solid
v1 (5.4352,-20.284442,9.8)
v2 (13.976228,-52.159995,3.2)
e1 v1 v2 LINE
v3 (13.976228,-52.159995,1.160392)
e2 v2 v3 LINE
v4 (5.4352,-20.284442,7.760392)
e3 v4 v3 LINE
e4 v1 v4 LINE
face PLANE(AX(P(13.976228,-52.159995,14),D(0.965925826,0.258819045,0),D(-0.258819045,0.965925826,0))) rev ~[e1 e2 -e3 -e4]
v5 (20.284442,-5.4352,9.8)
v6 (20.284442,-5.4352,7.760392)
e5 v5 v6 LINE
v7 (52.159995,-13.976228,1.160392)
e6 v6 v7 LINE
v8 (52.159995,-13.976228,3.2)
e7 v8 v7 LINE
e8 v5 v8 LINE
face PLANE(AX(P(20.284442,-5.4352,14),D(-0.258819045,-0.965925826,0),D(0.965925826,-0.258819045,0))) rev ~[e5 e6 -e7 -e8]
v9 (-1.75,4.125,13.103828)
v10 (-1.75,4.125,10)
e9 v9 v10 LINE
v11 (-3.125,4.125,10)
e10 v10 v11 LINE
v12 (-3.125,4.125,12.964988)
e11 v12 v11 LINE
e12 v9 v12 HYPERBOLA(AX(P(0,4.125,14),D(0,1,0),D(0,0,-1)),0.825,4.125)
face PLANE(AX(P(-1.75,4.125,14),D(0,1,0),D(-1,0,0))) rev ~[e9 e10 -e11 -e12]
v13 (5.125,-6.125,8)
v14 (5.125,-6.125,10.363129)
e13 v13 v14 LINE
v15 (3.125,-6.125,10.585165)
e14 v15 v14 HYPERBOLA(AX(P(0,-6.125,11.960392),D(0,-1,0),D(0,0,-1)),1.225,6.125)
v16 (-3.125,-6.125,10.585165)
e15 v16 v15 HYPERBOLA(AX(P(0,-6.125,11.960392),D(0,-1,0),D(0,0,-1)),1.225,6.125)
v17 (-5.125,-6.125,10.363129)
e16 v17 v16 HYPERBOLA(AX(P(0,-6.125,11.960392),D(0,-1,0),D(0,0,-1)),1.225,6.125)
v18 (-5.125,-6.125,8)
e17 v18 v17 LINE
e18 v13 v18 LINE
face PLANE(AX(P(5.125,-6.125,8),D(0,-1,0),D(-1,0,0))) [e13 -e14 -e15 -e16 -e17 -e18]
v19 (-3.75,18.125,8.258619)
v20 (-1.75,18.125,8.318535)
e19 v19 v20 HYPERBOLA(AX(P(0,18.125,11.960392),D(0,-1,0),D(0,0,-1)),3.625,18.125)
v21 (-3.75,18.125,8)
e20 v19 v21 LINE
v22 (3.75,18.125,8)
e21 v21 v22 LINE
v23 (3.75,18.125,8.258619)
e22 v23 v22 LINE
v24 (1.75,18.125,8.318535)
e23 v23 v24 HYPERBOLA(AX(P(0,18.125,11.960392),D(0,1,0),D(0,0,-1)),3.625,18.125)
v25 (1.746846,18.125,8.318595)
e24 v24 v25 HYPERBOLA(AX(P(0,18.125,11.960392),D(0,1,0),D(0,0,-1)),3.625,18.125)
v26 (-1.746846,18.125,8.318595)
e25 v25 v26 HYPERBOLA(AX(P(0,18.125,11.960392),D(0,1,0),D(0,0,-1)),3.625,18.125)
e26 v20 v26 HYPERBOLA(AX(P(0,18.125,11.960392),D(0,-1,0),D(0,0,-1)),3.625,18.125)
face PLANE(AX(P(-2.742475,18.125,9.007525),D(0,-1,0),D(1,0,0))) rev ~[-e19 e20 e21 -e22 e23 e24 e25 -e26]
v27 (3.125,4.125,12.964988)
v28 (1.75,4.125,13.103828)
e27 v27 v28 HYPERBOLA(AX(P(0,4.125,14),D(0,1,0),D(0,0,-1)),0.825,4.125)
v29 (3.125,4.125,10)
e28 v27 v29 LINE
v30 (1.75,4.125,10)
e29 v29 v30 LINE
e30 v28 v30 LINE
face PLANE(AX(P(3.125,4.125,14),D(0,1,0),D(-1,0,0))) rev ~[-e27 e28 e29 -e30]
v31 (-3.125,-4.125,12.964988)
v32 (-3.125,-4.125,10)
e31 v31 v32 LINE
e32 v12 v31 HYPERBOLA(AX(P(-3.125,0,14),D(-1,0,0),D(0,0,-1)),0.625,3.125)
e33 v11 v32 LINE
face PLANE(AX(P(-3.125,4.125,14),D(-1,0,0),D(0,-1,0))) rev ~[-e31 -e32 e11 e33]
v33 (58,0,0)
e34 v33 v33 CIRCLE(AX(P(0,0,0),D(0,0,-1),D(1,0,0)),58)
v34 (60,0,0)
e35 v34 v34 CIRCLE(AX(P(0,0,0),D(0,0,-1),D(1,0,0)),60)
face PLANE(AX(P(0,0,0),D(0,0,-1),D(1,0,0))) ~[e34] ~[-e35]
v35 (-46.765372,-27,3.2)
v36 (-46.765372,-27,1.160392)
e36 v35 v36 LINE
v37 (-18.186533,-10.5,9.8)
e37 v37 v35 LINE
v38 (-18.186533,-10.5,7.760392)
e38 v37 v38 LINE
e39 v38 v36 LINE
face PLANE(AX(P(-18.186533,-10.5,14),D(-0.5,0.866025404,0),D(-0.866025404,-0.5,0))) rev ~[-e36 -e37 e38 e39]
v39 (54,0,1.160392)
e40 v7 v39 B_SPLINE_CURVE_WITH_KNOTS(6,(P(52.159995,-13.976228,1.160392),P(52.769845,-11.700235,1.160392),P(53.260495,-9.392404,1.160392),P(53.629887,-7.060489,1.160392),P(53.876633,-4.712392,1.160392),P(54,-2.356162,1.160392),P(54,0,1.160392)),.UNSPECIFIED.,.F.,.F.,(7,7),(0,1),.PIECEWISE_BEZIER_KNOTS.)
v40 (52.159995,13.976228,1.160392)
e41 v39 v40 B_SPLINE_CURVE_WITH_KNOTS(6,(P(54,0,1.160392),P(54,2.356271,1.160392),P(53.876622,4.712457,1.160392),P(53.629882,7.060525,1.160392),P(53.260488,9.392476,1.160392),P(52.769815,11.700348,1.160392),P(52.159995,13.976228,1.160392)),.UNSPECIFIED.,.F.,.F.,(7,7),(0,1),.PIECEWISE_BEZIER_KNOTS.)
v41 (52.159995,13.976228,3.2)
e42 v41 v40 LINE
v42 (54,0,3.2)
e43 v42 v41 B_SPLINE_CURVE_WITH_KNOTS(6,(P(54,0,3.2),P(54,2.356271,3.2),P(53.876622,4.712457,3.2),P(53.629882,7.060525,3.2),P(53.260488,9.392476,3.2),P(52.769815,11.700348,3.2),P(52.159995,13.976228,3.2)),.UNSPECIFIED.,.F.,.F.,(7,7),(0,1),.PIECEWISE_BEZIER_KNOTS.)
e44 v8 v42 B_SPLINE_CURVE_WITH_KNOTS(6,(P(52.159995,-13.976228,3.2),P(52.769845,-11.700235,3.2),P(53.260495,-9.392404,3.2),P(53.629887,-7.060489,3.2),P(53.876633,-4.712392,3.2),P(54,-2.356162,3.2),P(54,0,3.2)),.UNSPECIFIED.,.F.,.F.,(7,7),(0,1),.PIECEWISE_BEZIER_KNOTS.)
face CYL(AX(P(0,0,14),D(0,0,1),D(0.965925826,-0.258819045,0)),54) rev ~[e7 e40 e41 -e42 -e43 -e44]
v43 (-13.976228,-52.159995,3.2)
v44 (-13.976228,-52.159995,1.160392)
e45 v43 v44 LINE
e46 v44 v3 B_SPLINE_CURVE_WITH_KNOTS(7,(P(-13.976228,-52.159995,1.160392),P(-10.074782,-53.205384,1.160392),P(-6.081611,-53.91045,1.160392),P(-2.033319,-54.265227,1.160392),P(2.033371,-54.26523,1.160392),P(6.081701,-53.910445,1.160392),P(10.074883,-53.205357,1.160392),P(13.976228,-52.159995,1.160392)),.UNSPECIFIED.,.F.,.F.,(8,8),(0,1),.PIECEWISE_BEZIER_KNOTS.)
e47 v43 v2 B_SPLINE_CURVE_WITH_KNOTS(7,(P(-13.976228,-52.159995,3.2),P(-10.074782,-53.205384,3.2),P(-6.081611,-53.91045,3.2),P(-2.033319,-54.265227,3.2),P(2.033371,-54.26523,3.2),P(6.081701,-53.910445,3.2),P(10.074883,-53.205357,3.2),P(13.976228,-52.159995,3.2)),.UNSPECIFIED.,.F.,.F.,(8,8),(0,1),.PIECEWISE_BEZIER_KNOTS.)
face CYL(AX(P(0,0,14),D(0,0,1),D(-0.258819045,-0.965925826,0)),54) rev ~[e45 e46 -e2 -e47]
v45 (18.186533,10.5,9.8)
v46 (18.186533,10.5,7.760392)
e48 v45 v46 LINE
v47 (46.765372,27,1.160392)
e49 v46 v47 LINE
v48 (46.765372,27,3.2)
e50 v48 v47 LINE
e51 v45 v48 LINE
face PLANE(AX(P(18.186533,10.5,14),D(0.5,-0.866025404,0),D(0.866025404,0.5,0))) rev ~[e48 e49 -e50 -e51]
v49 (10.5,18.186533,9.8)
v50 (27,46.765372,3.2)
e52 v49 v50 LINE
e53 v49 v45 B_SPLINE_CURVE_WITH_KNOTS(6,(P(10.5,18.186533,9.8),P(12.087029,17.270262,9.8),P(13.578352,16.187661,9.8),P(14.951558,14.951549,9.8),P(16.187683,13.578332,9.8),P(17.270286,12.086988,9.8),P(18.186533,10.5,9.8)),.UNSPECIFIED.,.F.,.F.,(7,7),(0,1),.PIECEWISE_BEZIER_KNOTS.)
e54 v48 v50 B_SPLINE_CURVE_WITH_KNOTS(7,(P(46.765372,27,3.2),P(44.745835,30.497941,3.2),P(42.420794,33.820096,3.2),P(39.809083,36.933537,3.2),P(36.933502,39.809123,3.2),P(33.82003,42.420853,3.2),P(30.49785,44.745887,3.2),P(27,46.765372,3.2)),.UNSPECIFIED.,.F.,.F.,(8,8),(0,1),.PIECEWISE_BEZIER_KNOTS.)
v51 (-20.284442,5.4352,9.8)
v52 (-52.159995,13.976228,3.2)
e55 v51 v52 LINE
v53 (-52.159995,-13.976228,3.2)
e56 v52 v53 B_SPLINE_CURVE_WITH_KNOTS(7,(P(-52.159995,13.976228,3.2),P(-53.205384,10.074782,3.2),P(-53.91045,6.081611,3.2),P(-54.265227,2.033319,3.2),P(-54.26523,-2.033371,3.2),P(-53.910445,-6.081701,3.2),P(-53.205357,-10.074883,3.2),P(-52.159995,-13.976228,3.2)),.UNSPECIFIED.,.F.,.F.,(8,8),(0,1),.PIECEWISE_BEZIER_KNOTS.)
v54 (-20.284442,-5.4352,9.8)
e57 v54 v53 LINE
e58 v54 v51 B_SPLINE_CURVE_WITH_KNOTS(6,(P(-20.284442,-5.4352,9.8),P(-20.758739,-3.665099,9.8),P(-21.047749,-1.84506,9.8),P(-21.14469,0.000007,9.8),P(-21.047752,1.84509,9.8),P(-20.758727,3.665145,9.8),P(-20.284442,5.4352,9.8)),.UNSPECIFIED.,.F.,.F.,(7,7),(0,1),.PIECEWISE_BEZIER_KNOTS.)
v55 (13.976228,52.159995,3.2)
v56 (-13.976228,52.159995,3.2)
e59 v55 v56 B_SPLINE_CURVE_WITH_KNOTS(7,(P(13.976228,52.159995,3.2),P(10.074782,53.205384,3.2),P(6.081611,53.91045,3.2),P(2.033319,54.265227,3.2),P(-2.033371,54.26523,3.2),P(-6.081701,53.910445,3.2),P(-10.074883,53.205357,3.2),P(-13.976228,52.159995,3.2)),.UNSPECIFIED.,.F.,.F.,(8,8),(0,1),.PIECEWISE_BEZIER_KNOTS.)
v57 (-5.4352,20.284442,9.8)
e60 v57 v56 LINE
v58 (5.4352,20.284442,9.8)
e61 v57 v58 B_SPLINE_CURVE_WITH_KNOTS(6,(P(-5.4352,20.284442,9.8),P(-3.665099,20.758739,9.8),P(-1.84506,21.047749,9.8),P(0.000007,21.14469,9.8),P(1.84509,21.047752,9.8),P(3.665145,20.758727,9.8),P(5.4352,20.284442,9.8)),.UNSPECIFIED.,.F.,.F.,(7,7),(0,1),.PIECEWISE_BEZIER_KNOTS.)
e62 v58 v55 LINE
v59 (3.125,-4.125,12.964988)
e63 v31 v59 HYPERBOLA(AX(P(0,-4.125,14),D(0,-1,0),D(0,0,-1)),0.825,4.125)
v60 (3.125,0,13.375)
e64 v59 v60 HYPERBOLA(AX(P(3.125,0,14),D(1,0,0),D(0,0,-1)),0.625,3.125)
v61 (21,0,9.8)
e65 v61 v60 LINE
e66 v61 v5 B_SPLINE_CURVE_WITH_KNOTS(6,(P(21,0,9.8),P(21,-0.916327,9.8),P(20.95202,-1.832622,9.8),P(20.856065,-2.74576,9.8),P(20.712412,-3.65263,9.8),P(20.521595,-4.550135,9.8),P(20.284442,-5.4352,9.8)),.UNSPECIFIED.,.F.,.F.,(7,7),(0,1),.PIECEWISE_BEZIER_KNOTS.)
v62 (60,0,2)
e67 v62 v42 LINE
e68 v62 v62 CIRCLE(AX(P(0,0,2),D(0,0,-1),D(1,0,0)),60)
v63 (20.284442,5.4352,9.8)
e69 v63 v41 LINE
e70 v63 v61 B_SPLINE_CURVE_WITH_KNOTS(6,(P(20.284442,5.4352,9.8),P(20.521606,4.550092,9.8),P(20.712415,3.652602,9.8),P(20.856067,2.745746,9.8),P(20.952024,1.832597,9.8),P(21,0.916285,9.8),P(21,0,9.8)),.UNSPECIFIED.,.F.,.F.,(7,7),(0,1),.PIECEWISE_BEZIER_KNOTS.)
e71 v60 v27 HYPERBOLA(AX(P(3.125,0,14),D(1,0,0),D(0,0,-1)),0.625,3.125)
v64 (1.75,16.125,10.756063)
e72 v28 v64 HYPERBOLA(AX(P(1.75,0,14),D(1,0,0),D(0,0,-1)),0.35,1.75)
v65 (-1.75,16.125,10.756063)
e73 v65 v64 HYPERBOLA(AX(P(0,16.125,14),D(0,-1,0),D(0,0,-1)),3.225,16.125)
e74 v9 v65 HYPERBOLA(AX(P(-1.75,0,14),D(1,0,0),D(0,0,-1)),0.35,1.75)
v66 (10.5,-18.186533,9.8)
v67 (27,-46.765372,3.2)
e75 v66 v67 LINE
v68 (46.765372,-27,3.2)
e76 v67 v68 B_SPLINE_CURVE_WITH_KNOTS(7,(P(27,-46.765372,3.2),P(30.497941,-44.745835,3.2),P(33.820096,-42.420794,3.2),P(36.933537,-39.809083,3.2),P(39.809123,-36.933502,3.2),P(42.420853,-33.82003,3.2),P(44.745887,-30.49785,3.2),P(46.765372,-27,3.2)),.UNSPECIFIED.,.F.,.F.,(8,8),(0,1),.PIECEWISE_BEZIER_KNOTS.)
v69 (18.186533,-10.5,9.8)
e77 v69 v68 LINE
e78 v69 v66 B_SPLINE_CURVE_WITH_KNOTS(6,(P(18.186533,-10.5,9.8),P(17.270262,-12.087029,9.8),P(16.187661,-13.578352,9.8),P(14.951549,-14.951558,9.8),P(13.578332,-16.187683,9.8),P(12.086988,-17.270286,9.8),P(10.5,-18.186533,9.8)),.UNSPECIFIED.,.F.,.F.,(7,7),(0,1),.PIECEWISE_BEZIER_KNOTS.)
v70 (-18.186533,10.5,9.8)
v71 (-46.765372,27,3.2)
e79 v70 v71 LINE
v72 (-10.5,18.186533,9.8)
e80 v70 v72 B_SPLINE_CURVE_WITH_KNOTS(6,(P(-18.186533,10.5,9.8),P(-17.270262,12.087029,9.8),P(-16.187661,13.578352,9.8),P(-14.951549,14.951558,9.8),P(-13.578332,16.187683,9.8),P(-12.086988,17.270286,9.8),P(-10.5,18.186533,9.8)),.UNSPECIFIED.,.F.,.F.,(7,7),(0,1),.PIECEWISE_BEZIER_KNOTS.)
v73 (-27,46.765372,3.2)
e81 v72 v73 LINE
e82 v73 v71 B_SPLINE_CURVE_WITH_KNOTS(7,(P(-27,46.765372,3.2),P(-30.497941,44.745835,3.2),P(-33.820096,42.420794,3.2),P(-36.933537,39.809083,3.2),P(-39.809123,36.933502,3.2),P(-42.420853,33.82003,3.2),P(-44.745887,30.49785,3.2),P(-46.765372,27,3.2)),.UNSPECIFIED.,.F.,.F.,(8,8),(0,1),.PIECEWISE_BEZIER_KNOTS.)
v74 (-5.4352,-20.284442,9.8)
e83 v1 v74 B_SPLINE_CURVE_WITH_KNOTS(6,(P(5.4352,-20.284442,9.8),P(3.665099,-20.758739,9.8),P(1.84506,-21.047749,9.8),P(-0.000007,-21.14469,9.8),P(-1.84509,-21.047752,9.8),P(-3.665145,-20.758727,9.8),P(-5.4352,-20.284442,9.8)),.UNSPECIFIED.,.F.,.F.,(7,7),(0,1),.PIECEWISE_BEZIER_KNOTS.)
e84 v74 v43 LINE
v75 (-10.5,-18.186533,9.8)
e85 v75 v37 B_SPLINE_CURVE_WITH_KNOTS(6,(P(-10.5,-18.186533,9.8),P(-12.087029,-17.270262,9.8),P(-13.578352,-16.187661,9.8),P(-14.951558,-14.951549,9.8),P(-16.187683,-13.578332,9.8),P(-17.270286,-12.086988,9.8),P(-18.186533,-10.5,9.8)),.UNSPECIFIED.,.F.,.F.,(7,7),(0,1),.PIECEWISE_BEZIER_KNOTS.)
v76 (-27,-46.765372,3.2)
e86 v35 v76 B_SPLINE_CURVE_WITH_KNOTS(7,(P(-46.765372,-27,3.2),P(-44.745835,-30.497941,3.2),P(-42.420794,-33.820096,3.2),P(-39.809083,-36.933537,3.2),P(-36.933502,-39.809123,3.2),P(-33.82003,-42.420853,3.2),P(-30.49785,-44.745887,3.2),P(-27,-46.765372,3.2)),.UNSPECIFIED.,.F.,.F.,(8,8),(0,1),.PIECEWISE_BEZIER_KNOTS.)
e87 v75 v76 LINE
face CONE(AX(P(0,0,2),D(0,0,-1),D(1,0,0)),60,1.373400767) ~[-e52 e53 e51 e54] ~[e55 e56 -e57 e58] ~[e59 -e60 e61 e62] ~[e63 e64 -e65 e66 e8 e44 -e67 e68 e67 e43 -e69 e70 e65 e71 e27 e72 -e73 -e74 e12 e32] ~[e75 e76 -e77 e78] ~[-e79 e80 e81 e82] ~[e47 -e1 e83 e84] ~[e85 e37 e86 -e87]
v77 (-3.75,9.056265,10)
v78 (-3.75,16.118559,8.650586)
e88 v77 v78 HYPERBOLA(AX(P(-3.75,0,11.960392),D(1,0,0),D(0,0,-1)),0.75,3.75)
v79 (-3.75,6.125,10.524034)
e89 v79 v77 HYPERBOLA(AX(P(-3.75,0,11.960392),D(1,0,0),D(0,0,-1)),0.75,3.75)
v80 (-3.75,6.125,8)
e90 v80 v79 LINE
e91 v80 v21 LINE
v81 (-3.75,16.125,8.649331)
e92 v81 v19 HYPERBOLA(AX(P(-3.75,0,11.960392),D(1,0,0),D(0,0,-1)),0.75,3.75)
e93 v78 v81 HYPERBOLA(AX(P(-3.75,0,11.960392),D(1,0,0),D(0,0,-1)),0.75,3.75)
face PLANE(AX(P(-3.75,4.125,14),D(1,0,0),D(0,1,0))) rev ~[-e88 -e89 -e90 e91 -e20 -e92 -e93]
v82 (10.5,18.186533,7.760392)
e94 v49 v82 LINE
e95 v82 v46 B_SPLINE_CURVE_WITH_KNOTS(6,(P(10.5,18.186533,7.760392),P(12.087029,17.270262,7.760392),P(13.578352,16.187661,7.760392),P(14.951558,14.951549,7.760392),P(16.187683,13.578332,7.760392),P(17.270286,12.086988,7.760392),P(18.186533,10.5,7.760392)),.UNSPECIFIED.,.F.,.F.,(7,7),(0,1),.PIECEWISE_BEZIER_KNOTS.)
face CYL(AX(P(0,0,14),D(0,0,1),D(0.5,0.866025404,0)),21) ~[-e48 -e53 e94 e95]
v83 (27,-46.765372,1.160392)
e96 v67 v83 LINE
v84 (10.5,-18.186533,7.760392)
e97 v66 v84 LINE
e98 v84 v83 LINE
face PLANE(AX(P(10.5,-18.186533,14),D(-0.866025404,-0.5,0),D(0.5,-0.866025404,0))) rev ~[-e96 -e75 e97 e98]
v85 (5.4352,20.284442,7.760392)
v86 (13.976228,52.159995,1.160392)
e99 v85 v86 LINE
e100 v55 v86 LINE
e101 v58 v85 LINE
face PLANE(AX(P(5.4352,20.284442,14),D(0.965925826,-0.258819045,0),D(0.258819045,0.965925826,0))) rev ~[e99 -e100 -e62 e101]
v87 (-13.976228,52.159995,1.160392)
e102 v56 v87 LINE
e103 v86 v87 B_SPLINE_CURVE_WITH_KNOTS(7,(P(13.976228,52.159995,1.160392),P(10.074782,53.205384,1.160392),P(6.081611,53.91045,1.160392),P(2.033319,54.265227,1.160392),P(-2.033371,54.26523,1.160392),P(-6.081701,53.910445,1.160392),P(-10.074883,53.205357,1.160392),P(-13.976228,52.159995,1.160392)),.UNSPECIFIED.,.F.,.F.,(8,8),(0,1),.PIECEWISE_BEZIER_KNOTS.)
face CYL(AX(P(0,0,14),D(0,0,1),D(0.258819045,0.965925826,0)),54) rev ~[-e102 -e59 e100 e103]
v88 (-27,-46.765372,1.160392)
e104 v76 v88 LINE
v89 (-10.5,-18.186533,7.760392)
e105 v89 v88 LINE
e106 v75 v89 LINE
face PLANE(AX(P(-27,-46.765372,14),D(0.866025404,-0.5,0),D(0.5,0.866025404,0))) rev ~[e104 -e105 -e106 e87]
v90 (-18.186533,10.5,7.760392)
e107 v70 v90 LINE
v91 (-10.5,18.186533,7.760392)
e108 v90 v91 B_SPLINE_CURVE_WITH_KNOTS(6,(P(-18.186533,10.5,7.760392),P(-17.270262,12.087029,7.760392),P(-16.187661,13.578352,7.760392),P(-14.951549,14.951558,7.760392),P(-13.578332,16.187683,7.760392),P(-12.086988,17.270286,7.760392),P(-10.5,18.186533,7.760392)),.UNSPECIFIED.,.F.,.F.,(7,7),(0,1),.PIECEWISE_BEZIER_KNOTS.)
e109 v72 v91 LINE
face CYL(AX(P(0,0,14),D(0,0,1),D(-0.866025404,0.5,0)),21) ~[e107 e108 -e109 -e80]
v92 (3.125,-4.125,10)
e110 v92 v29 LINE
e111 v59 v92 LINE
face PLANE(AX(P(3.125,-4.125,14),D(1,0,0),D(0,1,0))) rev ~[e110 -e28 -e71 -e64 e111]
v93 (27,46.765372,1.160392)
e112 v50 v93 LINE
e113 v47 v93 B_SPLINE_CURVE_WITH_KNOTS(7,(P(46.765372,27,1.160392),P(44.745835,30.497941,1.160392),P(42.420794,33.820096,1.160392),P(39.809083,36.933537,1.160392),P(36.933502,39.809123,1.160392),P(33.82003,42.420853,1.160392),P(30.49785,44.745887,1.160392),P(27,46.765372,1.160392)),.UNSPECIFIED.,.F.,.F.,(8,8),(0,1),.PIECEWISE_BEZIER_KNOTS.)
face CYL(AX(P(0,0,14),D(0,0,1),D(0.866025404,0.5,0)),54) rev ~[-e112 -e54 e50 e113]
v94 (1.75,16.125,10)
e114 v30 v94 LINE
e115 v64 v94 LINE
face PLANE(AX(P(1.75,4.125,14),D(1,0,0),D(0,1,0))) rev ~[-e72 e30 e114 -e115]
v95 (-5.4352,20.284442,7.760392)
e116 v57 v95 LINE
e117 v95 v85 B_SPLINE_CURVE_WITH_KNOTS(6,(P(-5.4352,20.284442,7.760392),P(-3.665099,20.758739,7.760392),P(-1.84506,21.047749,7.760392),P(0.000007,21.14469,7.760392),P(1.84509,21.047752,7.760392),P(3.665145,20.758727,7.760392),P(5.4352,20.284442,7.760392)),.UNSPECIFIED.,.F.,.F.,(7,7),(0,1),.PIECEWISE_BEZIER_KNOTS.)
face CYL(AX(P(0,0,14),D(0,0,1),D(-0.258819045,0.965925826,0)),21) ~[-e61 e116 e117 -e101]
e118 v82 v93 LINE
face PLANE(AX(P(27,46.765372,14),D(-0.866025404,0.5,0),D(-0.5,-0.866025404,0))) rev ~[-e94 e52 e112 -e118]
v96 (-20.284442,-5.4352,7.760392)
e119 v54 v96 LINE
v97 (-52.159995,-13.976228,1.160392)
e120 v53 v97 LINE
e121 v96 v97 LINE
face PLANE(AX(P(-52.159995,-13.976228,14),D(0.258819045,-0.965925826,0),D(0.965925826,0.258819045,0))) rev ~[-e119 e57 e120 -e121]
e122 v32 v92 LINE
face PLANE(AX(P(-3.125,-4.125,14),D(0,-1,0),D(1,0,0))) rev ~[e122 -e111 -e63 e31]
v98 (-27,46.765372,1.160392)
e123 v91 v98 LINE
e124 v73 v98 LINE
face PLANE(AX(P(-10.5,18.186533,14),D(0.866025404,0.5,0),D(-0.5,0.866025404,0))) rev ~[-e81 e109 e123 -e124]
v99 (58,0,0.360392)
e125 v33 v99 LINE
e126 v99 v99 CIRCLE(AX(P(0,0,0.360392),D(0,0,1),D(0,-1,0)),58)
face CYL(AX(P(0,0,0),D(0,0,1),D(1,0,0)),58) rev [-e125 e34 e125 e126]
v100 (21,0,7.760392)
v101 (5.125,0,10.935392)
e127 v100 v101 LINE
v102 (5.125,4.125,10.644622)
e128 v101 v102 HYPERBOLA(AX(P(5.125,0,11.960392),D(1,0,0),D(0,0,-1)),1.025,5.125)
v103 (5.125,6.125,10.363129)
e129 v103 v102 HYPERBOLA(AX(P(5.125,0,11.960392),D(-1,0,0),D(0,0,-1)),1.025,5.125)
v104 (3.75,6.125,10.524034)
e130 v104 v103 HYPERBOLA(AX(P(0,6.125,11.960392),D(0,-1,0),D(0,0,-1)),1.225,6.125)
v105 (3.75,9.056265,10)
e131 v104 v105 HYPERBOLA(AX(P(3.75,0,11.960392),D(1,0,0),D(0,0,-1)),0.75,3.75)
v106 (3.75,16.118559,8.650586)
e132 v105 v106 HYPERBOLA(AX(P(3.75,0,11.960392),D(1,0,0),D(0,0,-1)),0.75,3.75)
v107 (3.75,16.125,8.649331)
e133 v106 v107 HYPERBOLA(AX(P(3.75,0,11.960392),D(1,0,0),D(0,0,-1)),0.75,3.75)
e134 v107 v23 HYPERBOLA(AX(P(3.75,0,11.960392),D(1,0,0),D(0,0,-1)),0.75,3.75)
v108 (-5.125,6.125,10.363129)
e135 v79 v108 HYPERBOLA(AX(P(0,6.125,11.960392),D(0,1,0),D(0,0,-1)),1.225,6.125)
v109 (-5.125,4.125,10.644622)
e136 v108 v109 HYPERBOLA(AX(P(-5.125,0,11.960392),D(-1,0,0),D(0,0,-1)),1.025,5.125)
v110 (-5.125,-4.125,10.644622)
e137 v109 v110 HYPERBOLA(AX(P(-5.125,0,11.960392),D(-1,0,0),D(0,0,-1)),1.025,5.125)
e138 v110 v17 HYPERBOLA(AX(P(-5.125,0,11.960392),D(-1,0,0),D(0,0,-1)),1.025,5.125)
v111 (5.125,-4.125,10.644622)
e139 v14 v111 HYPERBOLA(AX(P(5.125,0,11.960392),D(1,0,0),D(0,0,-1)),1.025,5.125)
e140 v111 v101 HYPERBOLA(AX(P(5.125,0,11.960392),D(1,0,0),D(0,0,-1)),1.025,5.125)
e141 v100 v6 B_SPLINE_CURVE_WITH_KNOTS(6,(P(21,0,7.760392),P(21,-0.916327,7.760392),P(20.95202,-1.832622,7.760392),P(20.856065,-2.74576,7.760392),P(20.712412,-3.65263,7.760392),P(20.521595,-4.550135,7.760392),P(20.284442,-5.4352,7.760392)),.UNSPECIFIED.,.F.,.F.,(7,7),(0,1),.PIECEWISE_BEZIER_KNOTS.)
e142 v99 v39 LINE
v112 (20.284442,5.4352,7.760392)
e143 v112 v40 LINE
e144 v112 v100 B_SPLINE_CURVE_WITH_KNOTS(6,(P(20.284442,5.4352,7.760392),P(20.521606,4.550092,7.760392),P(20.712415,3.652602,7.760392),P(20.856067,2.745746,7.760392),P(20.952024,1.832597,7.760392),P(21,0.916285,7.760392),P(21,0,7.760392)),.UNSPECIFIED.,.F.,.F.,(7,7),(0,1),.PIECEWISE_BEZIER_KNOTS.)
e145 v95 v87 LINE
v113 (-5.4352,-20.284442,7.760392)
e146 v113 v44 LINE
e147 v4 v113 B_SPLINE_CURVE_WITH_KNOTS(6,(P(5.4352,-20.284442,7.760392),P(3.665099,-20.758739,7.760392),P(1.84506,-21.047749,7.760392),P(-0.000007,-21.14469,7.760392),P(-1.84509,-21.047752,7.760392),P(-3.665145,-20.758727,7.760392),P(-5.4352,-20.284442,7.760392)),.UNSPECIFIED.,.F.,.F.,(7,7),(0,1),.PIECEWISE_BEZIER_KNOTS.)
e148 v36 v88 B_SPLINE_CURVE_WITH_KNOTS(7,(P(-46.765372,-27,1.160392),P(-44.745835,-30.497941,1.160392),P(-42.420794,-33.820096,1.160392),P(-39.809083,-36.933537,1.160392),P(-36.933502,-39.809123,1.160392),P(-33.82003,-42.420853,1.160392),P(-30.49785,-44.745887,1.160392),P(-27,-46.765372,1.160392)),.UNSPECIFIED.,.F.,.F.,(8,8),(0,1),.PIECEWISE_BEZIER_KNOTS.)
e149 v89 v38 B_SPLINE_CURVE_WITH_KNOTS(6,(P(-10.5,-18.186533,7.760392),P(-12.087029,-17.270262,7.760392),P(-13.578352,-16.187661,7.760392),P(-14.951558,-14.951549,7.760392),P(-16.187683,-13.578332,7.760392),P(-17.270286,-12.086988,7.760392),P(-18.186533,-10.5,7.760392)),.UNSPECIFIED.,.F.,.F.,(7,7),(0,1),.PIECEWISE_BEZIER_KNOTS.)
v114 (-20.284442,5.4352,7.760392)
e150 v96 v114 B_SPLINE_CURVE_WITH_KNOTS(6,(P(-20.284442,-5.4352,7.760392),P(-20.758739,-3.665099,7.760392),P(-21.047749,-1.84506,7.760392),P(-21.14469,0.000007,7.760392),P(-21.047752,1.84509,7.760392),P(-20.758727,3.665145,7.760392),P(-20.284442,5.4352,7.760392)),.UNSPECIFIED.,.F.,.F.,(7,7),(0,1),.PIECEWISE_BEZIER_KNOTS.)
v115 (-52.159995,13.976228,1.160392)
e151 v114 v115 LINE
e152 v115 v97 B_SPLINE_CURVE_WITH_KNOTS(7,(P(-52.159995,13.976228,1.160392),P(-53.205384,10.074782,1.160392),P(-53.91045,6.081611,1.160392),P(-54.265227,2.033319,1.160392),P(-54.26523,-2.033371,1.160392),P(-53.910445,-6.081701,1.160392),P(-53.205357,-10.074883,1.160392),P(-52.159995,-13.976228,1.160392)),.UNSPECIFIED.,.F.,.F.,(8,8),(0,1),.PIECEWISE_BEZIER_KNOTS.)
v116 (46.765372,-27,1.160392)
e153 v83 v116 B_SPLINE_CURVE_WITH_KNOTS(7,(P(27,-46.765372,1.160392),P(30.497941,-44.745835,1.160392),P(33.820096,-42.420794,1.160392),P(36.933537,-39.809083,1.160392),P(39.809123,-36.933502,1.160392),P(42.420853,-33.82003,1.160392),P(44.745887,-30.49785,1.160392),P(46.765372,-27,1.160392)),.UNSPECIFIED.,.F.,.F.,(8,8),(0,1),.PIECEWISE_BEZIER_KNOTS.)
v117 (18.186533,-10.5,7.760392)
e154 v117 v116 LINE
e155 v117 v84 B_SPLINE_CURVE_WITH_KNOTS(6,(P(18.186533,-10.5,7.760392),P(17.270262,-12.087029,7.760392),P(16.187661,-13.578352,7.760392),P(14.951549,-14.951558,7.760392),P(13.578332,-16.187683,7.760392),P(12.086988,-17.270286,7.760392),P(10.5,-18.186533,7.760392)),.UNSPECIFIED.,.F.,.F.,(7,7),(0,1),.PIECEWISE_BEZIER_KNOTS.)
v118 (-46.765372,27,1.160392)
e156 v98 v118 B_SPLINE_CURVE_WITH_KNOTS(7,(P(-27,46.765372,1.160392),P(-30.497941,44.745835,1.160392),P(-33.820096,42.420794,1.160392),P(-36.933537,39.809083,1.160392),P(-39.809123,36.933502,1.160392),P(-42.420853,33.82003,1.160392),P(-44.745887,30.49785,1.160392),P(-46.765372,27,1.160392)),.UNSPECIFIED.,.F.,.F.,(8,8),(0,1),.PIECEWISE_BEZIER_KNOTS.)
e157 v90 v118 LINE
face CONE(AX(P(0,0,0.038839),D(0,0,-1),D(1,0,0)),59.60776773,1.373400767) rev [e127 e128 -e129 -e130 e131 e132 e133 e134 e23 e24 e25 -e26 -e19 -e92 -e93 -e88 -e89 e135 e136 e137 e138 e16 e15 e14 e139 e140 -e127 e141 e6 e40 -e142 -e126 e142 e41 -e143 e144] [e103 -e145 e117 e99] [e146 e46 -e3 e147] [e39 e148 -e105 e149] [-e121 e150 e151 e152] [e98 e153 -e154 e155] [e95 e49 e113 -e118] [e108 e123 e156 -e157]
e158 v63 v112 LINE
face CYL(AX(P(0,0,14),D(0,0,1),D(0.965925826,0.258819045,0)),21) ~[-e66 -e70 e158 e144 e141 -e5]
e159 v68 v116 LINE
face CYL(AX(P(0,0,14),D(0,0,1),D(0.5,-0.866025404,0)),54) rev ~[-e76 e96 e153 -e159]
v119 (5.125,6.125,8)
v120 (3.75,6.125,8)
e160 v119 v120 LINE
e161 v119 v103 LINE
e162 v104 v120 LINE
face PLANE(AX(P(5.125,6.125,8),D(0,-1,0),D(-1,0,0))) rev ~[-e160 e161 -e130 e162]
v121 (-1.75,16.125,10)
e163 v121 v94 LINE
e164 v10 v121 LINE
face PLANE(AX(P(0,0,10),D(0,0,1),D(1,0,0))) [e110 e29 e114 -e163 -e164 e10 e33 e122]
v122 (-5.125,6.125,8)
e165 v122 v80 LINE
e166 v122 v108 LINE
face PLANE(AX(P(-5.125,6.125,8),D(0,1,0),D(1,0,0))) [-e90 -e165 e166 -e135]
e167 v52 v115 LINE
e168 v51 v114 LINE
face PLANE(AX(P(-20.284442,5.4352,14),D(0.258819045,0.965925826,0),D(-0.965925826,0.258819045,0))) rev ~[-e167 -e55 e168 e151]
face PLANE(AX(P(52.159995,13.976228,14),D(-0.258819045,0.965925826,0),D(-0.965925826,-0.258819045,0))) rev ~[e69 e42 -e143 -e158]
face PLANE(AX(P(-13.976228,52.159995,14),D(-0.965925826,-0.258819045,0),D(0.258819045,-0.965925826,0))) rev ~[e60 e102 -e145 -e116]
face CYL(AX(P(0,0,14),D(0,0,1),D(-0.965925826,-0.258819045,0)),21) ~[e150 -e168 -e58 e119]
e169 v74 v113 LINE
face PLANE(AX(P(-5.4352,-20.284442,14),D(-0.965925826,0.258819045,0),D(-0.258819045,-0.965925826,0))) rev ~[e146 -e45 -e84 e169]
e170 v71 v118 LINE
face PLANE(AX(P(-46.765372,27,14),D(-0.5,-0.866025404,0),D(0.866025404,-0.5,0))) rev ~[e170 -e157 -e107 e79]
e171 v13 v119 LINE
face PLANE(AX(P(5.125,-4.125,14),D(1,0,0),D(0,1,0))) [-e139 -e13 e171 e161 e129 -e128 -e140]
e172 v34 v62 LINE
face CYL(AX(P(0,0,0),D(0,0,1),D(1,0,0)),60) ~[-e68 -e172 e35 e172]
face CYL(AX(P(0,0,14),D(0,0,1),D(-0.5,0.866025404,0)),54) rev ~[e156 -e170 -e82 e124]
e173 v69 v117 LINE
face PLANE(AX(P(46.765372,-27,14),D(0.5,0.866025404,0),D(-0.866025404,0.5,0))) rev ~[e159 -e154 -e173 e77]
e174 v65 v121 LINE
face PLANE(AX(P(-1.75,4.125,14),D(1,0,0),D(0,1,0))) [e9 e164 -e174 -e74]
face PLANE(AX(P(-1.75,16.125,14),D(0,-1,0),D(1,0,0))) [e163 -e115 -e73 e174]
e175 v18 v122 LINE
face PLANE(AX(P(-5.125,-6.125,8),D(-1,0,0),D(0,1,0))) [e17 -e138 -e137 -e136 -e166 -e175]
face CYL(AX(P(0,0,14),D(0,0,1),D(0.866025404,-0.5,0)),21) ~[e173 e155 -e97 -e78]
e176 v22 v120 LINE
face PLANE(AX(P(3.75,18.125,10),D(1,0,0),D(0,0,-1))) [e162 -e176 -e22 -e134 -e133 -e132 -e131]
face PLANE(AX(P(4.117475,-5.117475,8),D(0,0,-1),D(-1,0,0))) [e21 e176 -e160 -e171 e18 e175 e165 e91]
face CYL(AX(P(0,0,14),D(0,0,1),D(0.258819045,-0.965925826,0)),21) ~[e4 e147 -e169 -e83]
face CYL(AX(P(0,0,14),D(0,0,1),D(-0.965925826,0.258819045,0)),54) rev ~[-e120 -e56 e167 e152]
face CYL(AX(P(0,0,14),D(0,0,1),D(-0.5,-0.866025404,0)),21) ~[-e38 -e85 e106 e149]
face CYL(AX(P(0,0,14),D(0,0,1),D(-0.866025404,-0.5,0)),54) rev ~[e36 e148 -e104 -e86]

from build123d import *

# Parameters (mm, degrees)
F3_W         = 3.5
F3_H         = 12
F4_DEPTH     = 4
F5_T         = 2
F5_T3_DEPTH  = 6.9649879228
F5_T5_DEPTH  = 12.25
F5_T7_DEPTH  = 10.25
F5_T9_DEPTH  = 5.375
F5_T11_DEPTH = 16
F5_T13_DEPTH = 4.7560633483
F5_T15_DEPTH = 7.5
F5_T17_DEPTH = 5.375
F7_DEPTH     = 25


# Not quite as in the source:
# - a shell that OpenCascade refuses in one call is made with other operations: the cavity is built on its own and cut out


with BuildPart() as f1:
    # F0 (on Front) → F1 (revolve)
    with BuildSketch(Plane.XZ):
        Polygon((60, 2), (0, 14), (0, 0), (60, 0), align=None)
    revolve(axis=Axis((0, 0, 7), (0, 0, -1)))

    # F3 (on offset) → F4 (cut)
    with BuildSketch(Plane.XY.offset(14)):
        Polygon((3.125, -4.125), (3.125, 4.125), (1.75, 4.125), (-1.75, 4.125), (-3.125, 4.125), (-3.125, -4.125), align=None)
        with Locations((0, 10.125)):
            Rectangle(F3_W, F3_H)
    extrude(amount=-F4_DEPTH, mode=Mode.SUBTRACT)

    # F5: shell of thickness 2, made by hand


with BuildPart() as f5_core1:
    # F5_t2: copy of F1
    add(f1.part)

    # the walls: a layer under each face that stays
    f5_faces = [f5_core1.faces().sort_by_distance(p)[0] for p in [
        (-31.5412459886, 0, 7.6917508023),
        (3.125, 0, 11.6875),
        (0, -4.125, 11.5875),
        (-3.125, 0, 11.6875),
        (-2.4375, 4.125, 11.5519137918),
        (-1.75, 10.125, 11.5519137918),
        (0, 16.125, 10.3875),
        (1.75, 10.125, 11.5519137918),
        (2.4375, 4.125, 11.5519137918),
        (-60, 0, 1),
        (0, 6, 10),
    ]]
    thicken(f5_faces, amount=-F5_T, mode=Mode.SUBTRACT)

    # F5_s4 → F5_t3 (cut)
    with BuildSketch(Plane.XY.offset(8)):
        Polygon((3.105, 4.105), (5.125, 4.125), (5.125, 6.125), (3.125, 6.125), align=None)
        Polygon((3.105, -4.105), (5.125, -4.125), (5.125, -6.125), (3.125, -6.125), align=None)
        Polygon((-3.105, -4.105), (-3.125, -6.125), (-5.125, -6.125), (-5.125, -4.125), align=None)
        Polygon((-3.105, 4.105), (-5.125, 4.125), (-5.125, 6.125), (-3.125, 6.125), align=None)
    extrude(amount=F5_T3_DEPTH, mode=Mode.SUBTRACT)

    # F5_s6 → F5_t5 (cut)
    with BuildSketch(Plane.XZ.offset(-6.125)):
        Polygon((3.105, 10.02), (5.125, 10), (5.125, 8), (3.125, 8), align=None)
        Polygon((-3.105, 10.02), (-5.125, 10), (-5.125, 8), (-3.125, 8), align=None)
    extrude(amount=F5_T5_DEPTH, mode=Mode.SUBTRACT)

    # F5_s8 → F5_t7 (cut)
    with BuildSketch(Plane.YZ.offset(-5.125)):
        Polygon((-4.105, 10.02), (-6.125, 10), (-6.125, 8), (-4.125, 8), align=None)
    extrude(amount=F5_T7_DEPTH, mode=Mode.SUBTRACT)

    # F5_s10 → F5_t9 (cut)
    with BuildSketch(Plane.YZ.offset(-5.125)):
        Polygon((4.105, 10.02), (6.125, 10), (6.125, 8), (4.125, 8), align=None)
    extrude(amount=F5_T9_DEPTH, mode=Mode.SUBTRACT)

    # F5_s12 → F5_t11 (cut)
    with BuildSketch(Plane.XZ.offset(-18.125)):
        Polygon((-1.73, 10.02), (-3.75, 10), (-3.75, 8), (-1.75, 8), align=None)
        Polygon((1.73, 10.02), (3.75, 10), (3.75, 8), (1.75, 8), align=None)
    extrude(amount=F5_T11_DEPTH, mode=Mode.SUBTRACT)

    # F5_s14 → F5_t13 (cut)
    with BuildSketch(Plane.XY.offset(8)):
        Polygon((-1.73, 16.105), (-3.75, 16.125), (-3.75, 18.125), (-1.75, 18.125), align=None)
        Polygon((1.73, 16.105), (1.75, 18.125), (3.75, 18.125), (3.75, 16.125), align=None)
    extrude(amount=F5_T13_DEPTH, mode=Mode.SUBTRACT)

    # F5_s16 → F5_t15 (cut)
    with BuildSketch(Plane.YZ.offset(-3.75)):
        Polygon((16.105, 10.02), (18.125, 10), (18.125, 8), (16.125, 8), align=None)
    extrude(amount=F5_T15_DEPTH, mode=Mode.SUBTRACT)

    # F5_s18 → F5_t17 (cut)
    with BuildSketch(Plane.YZ.offset(-0.25)):
        Polygon((4.105, 10.02), (6.125, 10), (6.125, 8), (4.125, 8), align=None)
    extrude(amount=F5_T17_DEPTH, mode=Mode.SUBTRACT)


with BuildPart() as f1_1:
    add(f1.part)

    # what is left inside the walls is the cavity
    f5_cavity = [f5_core1.part.solids().sort_by_distance(p)[0] for p in [
        (0, 19.333333, 0.02),
    ]]
    add(f5_cavity, mode=Mode.SUBTRACT)

    # F6 (on offset) → F7 (cut)
    with BuildSketch(Plane.XY.offset(14)):
        with BuildLine():
            ThreePointArc((5.4351999472, -20.2844423521), (0, -21), (-5.4351999472, -20.2844423521))
            Line((-5.4351999472, -20.2844423521), (-13.9762284355, -52.1599946196))
            ThreePointArc((-13.9762284355, -52.1599946196), (0, -54), (13.9762284355, -52.1599946196))
            Line((13.9762284355, -52.1599946196), (5.4351999472, -20.2844423521))
        make_face()
        with BuildLine():
            ThreePointArc((18.1865334795, -10.5), (14.8492424049, -14.8492424049), (10.5, -18.1865334795))
            Line((10.5, -18.1865334795), (27, -46.7653718044))
            ThreePointArc((27, -46.7653718044), (38.1837661841, -38.1837661841), (46.7653718044, -27))
            Line((46.7653718044, -27), (18.1865334795, -10.5))
        make_face()
        with BuildLine():
            ThreePointArc((20.2844423521, 5.4351999472), (21, 0), (20.2844423521, -5.4351999472))
            Line((20.2844423521, -5.4351999472), (52.1599946196, -13.9762284355))
            ThreePointArc((52.1599946196, -13.9762284355), (54, 0), (52.1599946196, 13.9762284355))
            Line((52.1599946196, 13.9762284355), (20.2844423521, 5.4351999472))
        make_face()
        with BuildLine():
            ThreePointArc((10.5, 18.1865334795), (14.8492424049, 14.8492424049), (18.1865334795, 10.5))
            Line((18.1865334795, 10.5), (46.7653718044, 27))
            ThreePointArc((46.7653718044, 27), (38.1837661841, 38.1837661841), (27, 46.7653718044))
            Line((27, 46.7653718044), (10.5, 18.1865334795))
        make_face()
        with BuildLine():
            ThreePointArc((-5.4351999472, 20.2844423521), (0, 21), (5.4351999472, 20.2844423521))
            Line((5.4351999472, 20.2844423521), (13.9762284355, 52.1599946196))
            ThreePointArc((13.9762284355, 52.1599946196), (0, 54), (-13.9762284355, 52.1599946196))
            Line((-13.9762284355, 52.1599946196), (-5.4351999472, 20.2844423521))
        make_face()
        with BuildLine():
            ThreePointArc((-18.1865334795, 10.5), (-14.8492424049, 14.8492424049), (-10.5, 18.1865334795))
            Line((-10.5, 18.1865334795), (-27, 46.7653718044))
            ThreePointArc((-27, 46.7653718044), (-38.1837661841, 38.1837661841), (-46.7653718044, 27))
            Line((-46.7653718044, 27), (-18.1865334795, 10.5))
        make_face()
        with BuildLine():
            ThreePointArc((-20.2844423521, -5.4351999472), (-21, 0), (-20.2844423521, 5.4351999472))
            Line((-20.2844423521, 5.4351999472), (-52.1599946196, 13.9762284355))
            ThreePointArc((-52.1599946196, 13.9762284355), (-54, 0), (-52.1599946196, -13.9762284355))
            Line((-52.1599946196, -13.9762284355), (-20.2844423521, -5.4351999472))
        make_face()
        with BuildLine():
            ThreePointArc((-10.5, -18.1865334795), (-14.8492424049, -14.8492424049), (-18.1865334795, -10.5))
            Line((-18.1865334795, -10.5), (-46.7653718044, -27))
            ThreePointArc((-46.7653718044, -27), (-38.1837661841, -38.1837661841), (-27, -46.7653718044))
            Line((-27, -46.7653718044), (-10.5, -18.1865334795))
        make_face()
    extrude(amount=-F7_DEPTH, mode=Mode.SUBTRACT)


solid = f1_1.part
